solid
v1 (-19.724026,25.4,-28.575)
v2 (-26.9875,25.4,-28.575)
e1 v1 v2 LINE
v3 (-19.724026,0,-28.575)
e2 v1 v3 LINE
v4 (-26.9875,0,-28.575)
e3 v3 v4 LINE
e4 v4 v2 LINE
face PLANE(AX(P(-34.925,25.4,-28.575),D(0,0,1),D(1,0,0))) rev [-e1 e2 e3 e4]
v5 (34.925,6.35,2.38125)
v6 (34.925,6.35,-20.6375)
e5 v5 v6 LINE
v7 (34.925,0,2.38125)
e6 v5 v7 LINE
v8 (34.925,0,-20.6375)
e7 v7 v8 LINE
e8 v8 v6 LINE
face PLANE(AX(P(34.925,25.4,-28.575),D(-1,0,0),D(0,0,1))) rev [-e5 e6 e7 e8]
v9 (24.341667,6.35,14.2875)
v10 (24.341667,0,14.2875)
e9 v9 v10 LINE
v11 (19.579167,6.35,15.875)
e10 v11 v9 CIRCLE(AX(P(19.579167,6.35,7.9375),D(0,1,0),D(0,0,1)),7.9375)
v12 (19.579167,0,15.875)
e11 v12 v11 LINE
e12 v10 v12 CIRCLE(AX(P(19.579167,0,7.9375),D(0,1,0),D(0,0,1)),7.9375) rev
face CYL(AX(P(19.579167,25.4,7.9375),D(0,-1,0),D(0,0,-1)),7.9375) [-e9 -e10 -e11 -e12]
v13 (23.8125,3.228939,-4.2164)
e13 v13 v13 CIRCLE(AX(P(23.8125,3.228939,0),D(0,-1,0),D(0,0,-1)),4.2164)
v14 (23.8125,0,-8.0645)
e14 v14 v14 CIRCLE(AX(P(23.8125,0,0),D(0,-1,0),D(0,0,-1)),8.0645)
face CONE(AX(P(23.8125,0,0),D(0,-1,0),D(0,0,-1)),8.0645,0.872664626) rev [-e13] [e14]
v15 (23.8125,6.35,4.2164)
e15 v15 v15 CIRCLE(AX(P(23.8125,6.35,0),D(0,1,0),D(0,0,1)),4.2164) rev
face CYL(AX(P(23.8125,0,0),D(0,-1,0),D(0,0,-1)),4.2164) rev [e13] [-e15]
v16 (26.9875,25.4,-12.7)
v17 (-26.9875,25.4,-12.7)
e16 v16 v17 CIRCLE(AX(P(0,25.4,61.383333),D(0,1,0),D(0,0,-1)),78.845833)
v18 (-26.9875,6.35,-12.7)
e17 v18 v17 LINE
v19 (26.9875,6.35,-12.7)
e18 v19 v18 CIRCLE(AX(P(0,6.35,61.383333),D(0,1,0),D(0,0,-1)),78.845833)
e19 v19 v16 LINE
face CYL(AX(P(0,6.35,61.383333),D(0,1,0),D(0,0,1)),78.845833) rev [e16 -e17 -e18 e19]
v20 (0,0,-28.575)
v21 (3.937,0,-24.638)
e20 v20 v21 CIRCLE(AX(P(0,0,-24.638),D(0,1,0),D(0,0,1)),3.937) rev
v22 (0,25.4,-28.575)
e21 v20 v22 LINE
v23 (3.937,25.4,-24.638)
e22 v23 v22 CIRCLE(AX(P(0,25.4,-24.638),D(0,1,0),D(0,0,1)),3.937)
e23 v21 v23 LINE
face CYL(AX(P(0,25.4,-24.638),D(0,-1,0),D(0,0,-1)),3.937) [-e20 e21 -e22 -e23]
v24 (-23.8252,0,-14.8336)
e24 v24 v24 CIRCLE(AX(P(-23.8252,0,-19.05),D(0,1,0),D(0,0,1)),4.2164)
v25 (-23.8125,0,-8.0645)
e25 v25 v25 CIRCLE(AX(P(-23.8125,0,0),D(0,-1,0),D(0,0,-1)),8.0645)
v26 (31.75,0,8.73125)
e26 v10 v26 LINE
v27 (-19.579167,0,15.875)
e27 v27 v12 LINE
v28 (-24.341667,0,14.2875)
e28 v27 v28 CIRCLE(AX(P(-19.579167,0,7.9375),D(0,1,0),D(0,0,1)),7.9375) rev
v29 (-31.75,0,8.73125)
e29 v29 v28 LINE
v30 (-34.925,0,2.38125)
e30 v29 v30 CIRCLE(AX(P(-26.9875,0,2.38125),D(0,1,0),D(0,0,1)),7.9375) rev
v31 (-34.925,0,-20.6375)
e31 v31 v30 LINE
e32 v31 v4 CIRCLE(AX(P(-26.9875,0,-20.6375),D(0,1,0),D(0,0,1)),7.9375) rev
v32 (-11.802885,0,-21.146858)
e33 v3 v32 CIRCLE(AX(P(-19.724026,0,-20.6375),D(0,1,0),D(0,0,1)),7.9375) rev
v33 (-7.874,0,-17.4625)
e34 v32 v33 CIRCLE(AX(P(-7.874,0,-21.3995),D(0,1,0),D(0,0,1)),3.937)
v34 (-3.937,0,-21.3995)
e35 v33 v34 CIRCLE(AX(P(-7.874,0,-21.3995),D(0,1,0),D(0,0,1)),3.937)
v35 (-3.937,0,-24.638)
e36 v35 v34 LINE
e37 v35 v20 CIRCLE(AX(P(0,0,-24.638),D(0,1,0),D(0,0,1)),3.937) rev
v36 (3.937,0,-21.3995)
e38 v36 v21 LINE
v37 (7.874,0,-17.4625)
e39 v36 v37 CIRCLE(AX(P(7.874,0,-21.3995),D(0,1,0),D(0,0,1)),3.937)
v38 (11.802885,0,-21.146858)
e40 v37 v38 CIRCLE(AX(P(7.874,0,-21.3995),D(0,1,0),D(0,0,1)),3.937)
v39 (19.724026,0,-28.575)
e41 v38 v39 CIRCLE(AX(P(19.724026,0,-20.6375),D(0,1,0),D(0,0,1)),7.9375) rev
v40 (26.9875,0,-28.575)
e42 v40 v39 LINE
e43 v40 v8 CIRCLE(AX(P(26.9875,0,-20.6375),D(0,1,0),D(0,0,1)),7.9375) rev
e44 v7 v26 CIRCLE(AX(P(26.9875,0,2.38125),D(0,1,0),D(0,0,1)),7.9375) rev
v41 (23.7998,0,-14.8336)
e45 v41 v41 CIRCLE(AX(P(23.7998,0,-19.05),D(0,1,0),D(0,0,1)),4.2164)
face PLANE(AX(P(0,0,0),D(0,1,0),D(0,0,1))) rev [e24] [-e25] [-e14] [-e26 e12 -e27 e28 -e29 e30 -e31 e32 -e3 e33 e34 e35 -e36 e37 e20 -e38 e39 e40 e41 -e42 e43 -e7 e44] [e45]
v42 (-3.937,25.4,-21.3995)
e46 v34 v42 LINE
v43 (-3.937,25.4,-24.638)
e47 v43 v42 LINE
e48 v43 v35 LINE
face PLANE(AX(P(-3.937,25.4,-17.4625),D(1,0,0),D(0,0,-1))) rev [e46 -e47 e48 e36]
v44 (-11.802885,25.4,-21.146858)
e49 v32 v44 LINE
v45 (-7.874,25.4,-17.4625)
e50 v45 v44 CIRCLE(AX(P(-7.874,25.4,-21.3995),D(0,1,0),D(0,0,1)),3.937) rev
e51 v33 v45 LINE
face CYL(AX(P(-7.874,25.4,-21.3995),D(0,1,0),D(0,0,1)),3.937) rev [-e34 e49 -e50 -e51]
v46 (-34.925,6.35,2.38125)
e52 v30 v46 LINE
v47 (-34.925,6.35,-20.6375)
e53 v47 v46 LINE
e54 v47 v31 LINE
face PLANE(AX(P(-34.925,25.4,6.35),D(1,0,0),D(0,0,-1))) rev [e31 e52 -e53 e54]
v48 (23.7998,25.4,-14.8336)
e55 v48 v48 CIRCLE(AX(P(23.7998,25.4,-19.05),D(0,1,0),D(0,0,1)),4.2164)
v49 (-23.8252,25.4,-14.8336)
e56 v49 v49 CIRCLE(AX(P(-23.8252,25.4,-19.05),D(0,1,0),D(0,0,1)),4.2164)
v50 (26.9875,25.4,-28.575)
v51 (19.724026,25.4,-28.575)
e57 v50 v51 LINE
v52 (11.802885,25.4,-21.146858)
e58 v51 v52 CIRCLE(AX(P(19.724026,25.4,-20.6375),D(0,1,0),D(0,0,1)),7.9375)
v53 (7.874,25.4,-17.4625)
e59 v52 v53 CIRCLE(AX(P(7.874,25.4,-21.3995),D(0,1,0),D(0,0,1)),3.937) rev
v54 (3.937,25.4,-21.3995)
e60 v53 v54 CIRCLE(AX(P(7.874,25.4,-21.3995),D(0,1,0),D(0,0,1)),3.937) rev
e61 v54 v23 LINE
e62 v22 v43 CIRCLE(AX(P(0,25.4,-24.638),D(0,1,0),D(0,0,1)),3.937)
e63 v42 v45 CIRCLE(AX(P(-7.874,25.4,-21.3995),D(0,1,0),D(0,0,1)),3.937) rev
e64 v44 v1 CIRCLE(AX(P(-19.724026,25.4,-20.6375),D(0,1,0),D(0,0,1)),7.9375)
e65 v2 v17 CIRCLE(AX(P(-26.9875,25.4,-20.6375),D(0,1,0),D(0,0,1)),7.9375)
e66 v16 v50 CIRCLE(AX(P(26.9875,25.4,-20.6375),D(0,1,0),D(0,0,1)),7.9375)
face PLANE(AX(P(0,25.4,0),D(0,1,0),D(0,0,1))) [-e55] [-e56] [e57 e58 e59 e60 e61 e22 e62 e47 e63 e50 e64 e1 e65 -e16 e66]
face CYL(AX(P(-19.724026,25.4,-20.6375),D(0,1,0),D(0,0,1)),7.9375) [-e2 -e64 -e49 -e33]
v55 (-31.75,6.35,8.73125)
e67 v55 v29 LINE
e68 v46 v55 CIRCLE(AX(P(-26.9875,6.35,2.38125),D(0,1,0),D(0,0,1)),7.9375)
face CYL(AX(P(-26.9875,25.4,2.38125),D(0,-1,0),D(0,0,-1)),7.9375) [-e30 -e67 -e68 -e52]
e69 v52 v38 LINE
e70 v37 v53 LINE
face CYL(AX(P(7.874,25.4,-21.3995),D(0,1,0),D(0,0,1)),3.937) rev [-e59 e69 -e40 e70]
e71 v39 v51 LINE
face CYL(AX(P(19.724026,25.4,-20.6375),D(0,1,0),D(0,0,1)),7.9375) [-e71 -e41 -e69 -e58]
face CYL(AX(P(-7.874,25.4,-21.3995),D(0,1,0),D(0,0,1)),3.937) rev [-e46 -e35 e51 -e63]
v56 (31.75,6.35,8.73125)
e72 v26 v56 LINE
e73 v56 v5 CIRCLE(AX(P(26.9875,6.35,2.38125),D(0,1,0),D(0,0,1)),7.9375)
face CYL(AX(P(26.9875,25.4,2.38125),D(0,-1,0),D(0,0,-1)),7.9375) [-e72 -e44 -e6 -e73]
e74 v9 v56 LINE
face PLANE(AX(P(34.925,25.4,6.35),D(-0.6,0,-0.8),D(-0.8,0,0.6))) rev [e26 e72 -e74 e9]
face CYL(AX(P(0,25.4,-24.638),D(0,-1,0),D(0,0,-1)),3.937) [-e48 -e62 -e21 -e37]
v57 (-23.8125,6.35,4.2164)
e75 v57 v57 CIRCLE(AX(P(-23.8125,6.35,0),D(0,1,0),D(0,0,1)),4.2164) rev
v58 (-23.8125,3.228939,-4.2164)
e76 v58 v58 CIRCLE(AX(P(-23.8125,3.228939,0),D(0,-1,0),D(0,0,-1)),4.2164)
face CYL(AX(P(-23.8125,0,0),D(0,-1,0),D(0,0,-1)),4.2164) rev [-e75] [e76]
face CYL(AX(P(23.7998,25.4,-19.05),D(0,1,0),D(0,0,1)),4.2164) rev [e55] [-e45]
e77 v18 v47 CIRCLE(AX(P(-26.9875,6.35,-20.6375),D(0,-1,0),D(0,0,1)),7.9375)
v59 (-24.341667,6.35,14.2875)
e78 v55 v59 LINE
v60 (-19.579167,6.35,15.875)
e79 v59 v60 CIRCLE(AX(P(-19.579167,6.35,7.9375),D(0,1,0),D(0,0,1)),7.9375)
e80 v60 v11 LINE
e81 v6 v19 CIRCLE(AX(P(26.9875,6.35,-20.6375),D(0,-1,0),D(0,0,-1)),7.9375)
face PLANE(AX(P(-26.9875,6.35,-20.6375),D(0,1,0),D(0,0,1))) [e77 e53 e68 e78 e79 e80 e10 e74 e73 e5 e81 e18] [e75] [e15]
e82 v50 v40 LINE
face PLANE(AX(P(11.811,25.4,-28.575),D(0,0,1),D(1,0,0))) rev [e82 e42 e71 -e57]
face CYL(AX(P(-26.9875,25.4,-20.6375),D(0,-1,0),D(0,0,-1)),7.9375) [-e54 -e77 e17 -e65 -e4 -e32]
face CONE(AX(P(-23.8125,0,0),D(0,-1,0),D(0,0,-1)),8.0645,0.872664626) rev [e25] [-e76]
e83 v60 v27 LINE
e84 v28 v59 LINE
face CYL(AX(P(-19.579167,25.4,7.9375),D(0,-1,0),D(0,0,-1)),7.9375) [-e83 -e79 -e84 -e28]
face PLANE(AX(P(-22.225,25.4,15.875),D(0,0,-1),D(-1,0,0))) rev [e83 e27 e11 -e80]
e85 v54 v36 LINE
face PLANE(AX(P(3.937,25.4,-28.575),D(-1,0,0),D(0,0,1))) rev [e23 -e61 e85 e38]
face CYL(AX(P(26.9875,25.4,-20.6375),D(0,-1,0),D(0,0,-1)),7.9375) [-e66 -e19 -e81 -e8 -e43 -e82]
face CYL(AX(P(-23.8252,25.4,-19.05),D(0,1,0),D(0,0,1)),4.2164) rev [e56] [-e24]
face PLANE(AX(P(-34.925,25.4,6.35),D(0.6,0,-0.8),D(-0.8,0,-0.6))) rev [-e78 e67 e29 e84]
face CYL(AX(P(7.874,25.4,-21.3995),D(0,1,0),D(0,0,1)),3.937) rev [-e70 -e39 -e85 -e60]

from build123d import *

# Parameters (mm, degrees)
BOSS_EXTRUDE1_DEPTH                                 = 25.4
FILLET1_R                                           = 3.937
FILLET2_R                                           = 7.9375
F_5_16_CLEARANCE_HOLE1_D                            = 8.4328
CSK_FOR_5_16_FLAT_HEAD_MACHINE_SCREW_10_D           = 8.4328
CSK_FOR_5_16_FLAT_HEAD_MACHINE_SCREW_10_CSINK_D     = 16.129
CSK_FOR_5_16_FLAT_HEAD_MACHINE_SCREW_10_CSINK_ANGLE = 100
CUT_EXTRUDE2_DEPTH                                  = 19.05


with BuildPart() as part:
    # Sketch2 → Boss-Extrude1 (new body)
    with BuildSketch(Plane(origin=(0, 0, 0), x_dir=(1, 0, 0), z_dir=(0, 1, 0))):
        Polygon((-11.811, 17.4625), (-3.937, 17.4625), (-3.937, 28.575), (3.937, 28.575), (3.937, 17.4625), (11.811, 17.4625), (11.811, 28.575), (34.925, 28.575), (34.925, -6.35), (22.225, -15.875), (-22.225, -15.875), (-34.925, -6.35), (-34.925, 28.575), (-11.811, 28.575), align=None)
    extrude(amount=BOSS_EXTRUDE1_DEPTH)

    # Fillet1
    fillet1_edges = [part.edges().sort_by_distance(p)[0] for p in [
        (11.811, 12.7, -17.4625),
        (3.937, 12.7, -17.4625),
        (3.937, 12.7, -28.575),
        (-3.937, 12.7, -28.575),
        (-3.937, 12.7, -17.4625),
        (-11.811, 12.7, -17.4625),
    ]]
    fillet(fillet1_edges, radius=FILLET1_R - 0.0001)  # a hair under: the kernel refuses the full size

    # Fillet2
    fillet2_edges = [part.edges().sort_by_distance(p)[0] for p in [
        (34.925, 12.7, 6.35),
        (22.225, 12.7, 15.875),
        (-22.225, 12.7, 15.875),
        (-34.925, 12.7, 6.35),
        (34.925, 12.7, -28.575),
        (11.811, 12.7, -28.575),
        (-11.811, 12.7, -28.575),
        (-34.925, 12.7, -28.575),
    ]]
    fillet(fillet2_edges, radius=FILLET2_R)

    # 5/16 Clearance Hole1 (through all)
    with Locations(Plane(origin=(0, 25.4, 0), x_dir=(1, 0, 0), z_dir=(0, 1, 0))):
        with Locations((-23.8252, 19.05), (23.7998, 19.05)):
            Hole(F_5_16_CLEARANCE_HOLE1_D / 2)

    # CSK for 5/16 Flat Head Machine Screw (100)1 (through all)
    with Locations(Plane(origin=(0, 0, 0), x_dir=(-1, 0, 0), z_dir=(0, -1, 0))):
        with Locations((-23.8125, 0), (23.8125, 0)):
            CounterSinkHole(CSK_FOR_5_16_FLAT_HEAD_MACHINE_SCREW_10_D / 2, CSK_FOR_5_16_FLAT_HEAD_MACHINE_SCREW_10_CSINK_D / 2, counter_sink_angle=CSK_FOR_5_16_FLAT_HEAD_MACHINE_SCREW_10_CSINK_ANGLE)

    # Sketch8 → Cut-Extrude2 (cut)
    with BuildSketch(Plane(origin=(0, 25.4, 0), x_dir=(1, 0, 0), z_dir=(0, 1, 0))):
        with BuildLine():
            Line((24.341666667, -14.2875), (31.75, -8.73125))
            ThreePointArc((31.75, -8.73125), (34.087015829, -5.931007914), (34.925, -2.38125))
            Line((34.925, -2.38125), (34.925, 20.6375))
            ThreePointArc((34.925, 20.6375), (32.600160076, 15.024839924), (26.9875, 12.7))
            ThreePointArc((26.9875, 12.7), (0, 17.4625), (-26.9875, 12.7))
            ThreePointArc((-26.9875, 12.7), (-32.600160076, 15.024839924), (-34.925, 20.6375))
            Line((-34.925, 20.6375), (-34.925, -2.38125))
            ThreePointArc((-34.925, -2.38125), (-34.087015829, -5.931007914), (-31.75, -8.73125))
            Line((-31.75, -8.73125), (-24.341666667, -14.2875))
            ThreePointArc((-24.341666667, -14.2875), (-22.089224559, -15.467673678), (-19.579166667, -15.875))
            Line((-19.579166667, -15.875), (19.579166667, -15.875))
            ThreePointArc((19.579166667, -15.875), (22.089224559, -15.467673678), (24.341666667, -14.2875))
        make_face()
    extrude(amount=-CUT_EXTRUDE2_DEPTH, mode=Mode.SUBTRACT)


solid = part.part
